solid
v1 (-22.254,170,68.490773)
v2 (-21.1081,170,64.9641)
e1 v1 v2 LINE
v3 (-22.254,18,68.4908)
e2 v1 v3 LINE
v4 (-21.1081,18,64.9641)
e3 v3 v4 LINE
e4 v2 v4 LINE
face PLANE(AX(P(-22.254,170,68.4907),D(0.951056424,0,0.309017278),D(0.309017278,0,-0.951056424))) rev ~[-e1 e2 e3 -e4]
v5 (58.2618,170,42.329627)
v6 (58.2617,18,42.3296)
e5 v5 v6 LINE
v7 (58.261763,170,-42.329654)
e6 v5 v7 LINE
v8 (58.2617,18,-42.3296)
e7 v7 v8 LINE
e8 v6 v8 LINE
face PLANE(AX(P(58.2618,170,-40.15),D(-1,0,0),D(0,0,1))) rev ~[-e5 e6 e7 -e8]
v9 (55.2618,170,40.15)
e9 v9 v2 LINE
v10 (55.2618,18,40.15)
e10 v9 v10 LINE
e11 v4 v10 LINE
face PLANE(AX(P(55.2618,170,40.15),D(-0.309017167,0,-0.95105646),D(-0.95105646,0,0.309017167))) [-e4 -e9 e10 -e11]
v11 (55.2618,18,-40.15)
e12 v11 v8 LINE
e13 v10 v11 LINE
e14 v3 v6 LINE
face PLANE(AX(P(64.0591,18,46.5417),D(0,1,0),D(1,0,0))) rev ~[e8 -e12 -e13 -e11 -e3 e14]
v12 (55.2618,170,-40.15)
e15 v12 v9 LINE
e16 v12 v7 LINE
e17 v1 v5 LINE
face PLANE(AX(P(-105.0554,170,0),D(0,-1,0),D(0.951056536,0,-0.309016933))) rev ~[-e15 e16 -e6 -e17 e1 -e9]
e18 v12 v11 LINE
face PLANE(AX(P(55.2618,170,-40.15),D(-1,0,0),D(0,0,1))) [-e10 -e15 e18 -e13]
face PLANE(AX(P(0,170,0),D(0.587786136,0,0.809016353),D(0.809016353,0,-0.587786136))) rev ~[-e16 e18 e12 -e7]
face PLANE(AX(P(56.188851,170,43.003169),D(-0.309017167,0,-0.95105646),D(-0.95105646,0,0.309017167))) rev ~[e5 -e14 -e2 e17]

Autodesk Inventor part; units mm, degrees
sketch "草图1" plane through (0, 0, 0) normal (0, 1, 0) x (-1, 0, 0)
  line L0 (82.5131, 0) -> (25.498, -78.4746)
  line L1 (25.498, -78.4746) -> (-66.7545, -48.5)
  line L2 (-66.7545, -48.5) -> (-66.7545, 48.5)
  line L3 (-66.7545, 48.5) -> (25.498, 78.4746)
  line L4 (25.498, 78.4746) -> (82.5131, 0)
  point P0 (0, 0)
  point P1 (0, 0)
  dimension "d0" = 97
ref_plane "工作平面1" through (0, 170, 0) normal (0, 1, 0) x (-1, 0, 0)
sketch "草图2" plane through (0, 170, 0) normal (0, 1, 0) x (-1, 0, 0)
  line L0 (105.0554, 0) -> (32.4639, -99.9136)
  line L1 (32.4639, -99.9136) -> (-84.9916, -61.75)
  line L2 (-84.9916, -61.75) -> (-84.9916, 61.75)
  line L3 (-84.9916, 61.75) -> (32.4639, 99.9136)
  line L4 (32.4639, 99.9136) -> (105.0554, 0)
  point P0 (0, 0)
  point P1 (0, 0)
  dimension "d2" = 123.5
loft "放样1" add profiles "草图2", "草图1"
sketch "草图3" plane through (84.9916, 170, 61.75) normal (0, 1, 0) x (1, 0, 0)
  line L0 (-153.2988, 61.75) -> (-106.0997, 126.7141)
  line L1 (-106.0997, 126.7141) -> (-29.7298, 101.9)
  line L2 (-29.7298, 101.9) -> (-29.7298, 21.6)
  line L3 (-29.7298, 21.6) -> (-106.0997, -3.2141)
  line L4 (-106.0997, -3.2141) -> (-153.2988, 61.75)
  point P0 (-84.9916, 61.75)
  point P1 (-84.9916, 61.75)
  dimension "d7" = 80.3
extrude "拉伸1" cut sketch "草图3" against normal blind 164
shell "抽壳1" thickness 3 removed faces 1 at (10.4732, 170, -75.5426)
sketch "草图5" plane through (66.7545, 0, -48.5) normal (0, -1, 0) x (1, 0, 0)
  line L0 (-98.0659, 144.8667) -> (-91.2229, 123.806) projected
  line L1 (-106.5917, 71.5) -> (-123.9122, 81.5)
  line L2 (-107.7408, 69.3836) -> (-125.561, 78.4634)
  arc A0 (-106.5917, 71.5) -> (-107.7408, 69.3836) centre (-66.7545, 48.5) ccw
  arc A1 (-123.9122, 81.5) -> (-125.561, 78.4634) centre (-66.7545, 48.5) ccw
  point P0 (-99.2814, 81.0269)
  dimension "d37" = 132
  dimension "d38" = 92
  dimension "d40" = 3
extrude "拉伸2" add sketch "草图5" along normal blind 3
sketch "草图7" plane through (66.7545, -3, -48.5) normal (0, -1, 0) x (1, 0, 0)
  arc A0 (-100.9392, 79.28) -> (-106.5917, 71.5) centre (-66.7545, 48.5) ccw
  arc A1 (-115.8021, 92.6626) -> (-125.561, 78.4634) centre (-66.7545, 48.5) ccw
  arc A2 (-100.9392, 79.28) -> (-107.7408, 69.3836) centre (-66.7545, 48.5) ccw
  line L0 (-100.9392, 79.28) -> (-115.8021, 92.6626)
  line L1 (-125.561, 78.4634) -> (-107.7408, 69.3836) projected
  line L2 (-107.7408, 69.3836) -> (-125.561, 78.4634)
  dimension "d25" = 92
  dimension "d41" = 15
extrude "拉伸3" add sketch "草图7" along normal blind 3
chamfer "倒角1" distance 1 angle 45 1 edges at (-41.6161, -3, 37.4713)
sketch "草图8" plane through (66.7545, 0, -48.5) normal (0, -1, 0) x (1, 0, 0)
  circle A0 centre (-66.7545, 48.5) radius 15
  dimension "d100" = 30
extrude "拉伸4" add sketch "草图8" along normal blind 30
pattern_circular "环形阵列1" count 10 over 360 about axis through (0, -10, 0) along (0, 1, 0) of "拉伸3", "拉伸2", "倒角1"
sketch "草图9" plane through (64.0591, 3, 46.5417) normal (0, 1, 0) x (1, 0, 0)
  line L0 (-132.3664, 46.5417) -> (-85.1672, 111.5058) projected
  line L1 (-85.1672, -18.4224) -> (-132.3664, 46.5417) projected
  line L2 (-8.7974, 6.3917) -> (-85.1672, -18.4224) projected
  line L3 (-8.7974, 86.6917) -> (-8.7974, 6.3917) projected
  line L4 (-85.1672, 111.5058) -> (-8.7974, 86.6917) projected
  line L5 (-136.0746, 46.5417) -> (-86.3131, -21.9491) projected
  line L6 (-86.3131, -21.9491) -> (-5.7974, 4.2121) projected
  line L7 (-5.7974, 4.2121) -> (-5.7974, 88.8713) projected
  line L8 (-5.7974, 88.8713) -> (-86.3131, 115.0325) projected
  line L9 (-86.3131, 115.0325) -> (-136.0746, 46.5417) projected
  line L10 (-85.1672, -18.4224) -> (-132.3664, 46.5417) projected
  line L11 (-132.3664, 46.5417) -> (-85.1672, 111.5058) projected
  line L12 (-85.1672, 111.5058) -> (-8.7974, 86.6917) projected
  line L13 (-8.7974, 86.6917) -> (-8.7974, 6.3917) projected
  line L14 (-8.7974, 6.3917) -> (-85.1672, -18.4224) projected
  line L15 (-143.2406, 46.5417) -> (-88.5276, 121.8477) projected
  line L16 (-88.5276, -28.7643) -> (-143.2406, 46.5417) projected
  line L17 (0, 0) -> (-88.5276, -28.7643) projected
  line L18 (0, 93.0834) -> (0, 0) projected
  line L19 (-88.5276, 121.8477) -> (0, 93.0834) projected
  line L20 (-145.4076, 46.5417) -> (-89.1972, 123.9087)
  line L21 (-89.1972, 123.9087) -> (1.7532, 94.3571)
  line L22 (1.7532, 94.3571) -> (1.7532, -1.2738)
  line L23 (1.7532, -1.2738) -> (-89.1972, -30.8253)
  line L24 (-89.1972, -30.8253) -> (-145.4076, 46.5417)
  point P0 (-64.0591, 46.5417)
extrude "拉伸5" add sketch "草图9" along normal blind 15 contours L15 L19 L18 L17 L16 | L20 L21 L22 L23 L24
sketch "草图10" plane through (84.9916, 6, 61.75) normal (0, 1, 0) x (1, 0, 0)
  line L0 (-153.2988, 61.75) -> (-106.0997, 126.7141) projected
  line L1 (-106.0997, -3.2141) -> (-153.2988, 61.75) projected
  line L2 (-29.7298, 21.6) -> (-106.0997, -3.2141) projected
  line L3 (-29.7298, 101.9) -> (-29.7298, 21.6) projected
  line L4 (-106.0997, 126.7141) -> (-29.7298, 101.9) projected
  line L5 (-107.2456, 130.2408) -> (-157.007, 61.75) projected
  line L6 (-26.7298, 104.0796) -> (-107.2456, 130.2408) projected
  line L7 (-26.7298, 19.4204) -> (-26.7298, 104.0796) projected
  line L8 (-107.2456, -6.7408) -> (-26.7298, 19.4204) projected
  line L9 (-157.007, 61.75) -> (-107.2456, -6.7408) projected
  line L10 (-166.1621, 61.75) -> (-110.0746, 138.9477) projected
  line L11 (-110.0746, -15.4477) -> (-166.1621, 61.75) projected
  line L12 (-19.3233, 14.0392) -> (-110.0746, -15.4477) projected
  line L13 (-19.3233, 109.4608) -> (-19.3233, 14.0392) projected
  line L14 (-110.0746, 138.9477) -> (-19.3233, 109.4608) projected
  point P0 (-84.9916, 61.75)
sketch "草图11" plane through (64.0591, 18, 46.5417) normal (0, 1, 0) x (1, 0, 0)
  line L0 (-64.0591, 46.5417) -> (2.6954, 46.5417) construction
  line L1 (-86.3131, 115.0325) -> (-136.0746, 46.5417) projected
  line L2 (-5.7974, 88.8713) -> (-86.3131, 115.0325) projected
  line L3 (-5.7974, 4.2121) -> (-5.7974, 88.8713) projected
  line L4 (-86.3131, -21.9491) -> (-5.7974, 4.2121) projected
  line L5 (-136.0746, 46.5417) -> (-86.3131, -21.9491) projected
  line L6 (-145.2296, 46.5417) -> (-89.1422, 123.7394) projected
  line L7 (-89.1422, -30.656) -> (-145.2296, 46.5417) projected
  line L8 (1.6092, -1.1691) -> (-89.1422, -30.656) projected
  line L9 (1.6092, 94.2525) -> (1.6092, -1.1691) projected
  line L10 (-89.1422, 123.7394) -> (1.6092, 94.2525) projected
  circle A0 centre (-2.0908, 11.2121) radius 1.25
  line L11 (-5.7974, 4.2121) -> (1.6092, -1.1691) construction
  line L12 (-5.7974, 4.2121) -> (-5.7974, 88.8713) projected
  line L13 (-86.3131, -21.9491) -> (-5.7974, 4.2121) projected
  line L14 (1.6092, -1.1691) -> (-89.1422, -30.656) projected
  line L15 (1.6092, 94.2525) -> (1.6092, -1.1691) projected
  circle A1 centre (-11.3094, -1.4762) radius 1.25
  line L16 (-2.0941, 7.5215) -> (-0.5941, 7.5215)
  line L17 (-0.5941, 7.5215) -> (-0.5941, 0.4317)
  line L18 (-2.0941, 7.5215) -> (-3.5941, 7.5215)
  line L19 (-3.5941, 7.5215) -> (-3.5941, 2.6113)
  line L20 (-7.8005, -0.3326) -> (-7.3369, -1.7592)
  line L21 (-7.3369, -1.7592) -> (-0.5941, 0.4317)
  line L22 (-7.8005, -0.3326) -> (-8.264, 1.094)
  line L23 (-8.264, 1.094) -> (-3.5941, 2.6113)
  dimension "d63" = 2.5
  dimension "d69" = 3.7
  dimension "d131" = 3.6906
extrude "拉伸7" cut sketch "草图11" against normal blind 3 contours A0 | A1 | L16 L17 L21 L20 L22 L23 L19 L18
extrude "拉伸8" add sketch "草图10" along normal blind 10 and the other way blind 3 contours L10 L14 L13 L12 L11
extrude "拉伸9" cut sketch "草图10" along normal blind 10 and the other way blind 3 contours L10 L14 L13 L12 L11
ref_plane "工作平面2" through (84.9916, 7, 61.75) normal (0, 1, 0) x (1, 0, 0)
sketch "草图12" plane through (84.9916, 7, 61.75) normal (0, 1, 0) x (1, 0, 0)
  line L0 (-107.2456, -6.7408) -> (-26.7298, 19.4204) projected
  line L1 (-60.7054, 8.3811) -> (-61.6324, 11.2342)
  line L2 (-29.7298, 21.6) -> (-106.0997, -3.2141) projected
  line L3 (-89.8404, 2.0689) -> (-88.9133, -0.7843)
  line L4 (-107.2456, -6.7408) -> (-26.7298, 19.4204) projected
  line L5 (-29.7298, 21.6) -> (-106.0997, -3.2141) projected
  line L6 (-63.5345, 10.6162) -> (-62.6075, 7.763)
  line L7 (-65.4366, 9.9982) -> (-64.5096, 7.145)
  line L8 (-67.3388, 9.3801) -> (-66.4117, 6.527)
  line L9 (-69.2409, 8.7621) -> (-68.3138, 5.9089)
  line L10 (-71.143, 8.1441) -> (-70.2159, 5.2909)
  line L11 (-73.0451, 7.526) -> (-72.118, 4.6729)
  line L12 (-74.9472, 6.908) -> (-74.0202, 4.0548)
  line L13 (-76.7905, 6.3091) -> (-75.7638, 3.4883)
  line L14 (-84.134, 3.923) -> (-83.207, 1.0698)
  line L15 (-86.0362, 3.305) -> (-85.1091, 0.4518)
  line L16 (-87.9383, 2.6869) -> (-87.0112, -0.1662)
  line L17 (-80.3298, 5.1591) -> (-79.4028, 2.3059)
  line L18 (-82.2319, 4.541) -> (-81.3049, 1.6879)
  line L19 (-78.4277, 5.7771) -> (-77.5006, 2.9239)
  line L20 (-61.6324, 11.2342) -> (-63.5345, 10.6162)
  line L21 (-62.6075, 7.763) -> (-60.7054, 8.3811)
  line L22 (-66.4117, 6.527) -> (-64.5096, 7.145)
  line L23 (-65.4366, 9.9982) -> (-67.3388, 9.3801)
  line L24 (-70.2159, 5.2909) -> (-68.3138, 5.9089)
  line L25 (-69.2409, 8.7621) -> (-71.143, 8.1441)
  line L26 (-74.0202, 4.0548) -> (-72.118, 4.6729)
  line L27 (-73.0451, 7.526) -> (-74.9472, 6.908)
  line L28 (-76.7905, 6.3091) -> (-78.4277, 5.7771)
  line L29 (-77.5006, 2.9239) -> (-75.7638, 3.4883)
  line L30 (-81.3049, 1.6879) -> (-79.4028, 2.3059)
  line L31 (-80.3298, 5.1591) -> (-82.2319, 4.541)
  line L32 (-84.134, 3.923) -> (-86.0362, 3.305)
  line L33 (-87.9383, 2.6869) -> (-89.8404, 2.0689)
  line L34 (-88.9133, -0.7843) -> (-87.0112, -0.1662)
  line L35 (-85.1091, 0.4518) -> (-83.207, 1.0698)
  line L36 (-58.8033, 8.9991) -> (-59.7303, 11.8523)
  line L37 (-56.9011, 9.6171) -> (-57.8282, 12.4703)
  line L38 (-54.999, 10.2352) -> (-55.9261, 13.0883)
  line L39 (-53.0969, 10.8532) -> (-54.024, 13.7064)
  point P0 (-84.9916, 61.75)
  dimension "d73" = 2
  dimension "d74" = 2
  dimension "d75" = 2
  dimension "d76" = 2
  dimension "d77" = 2
  dimension "d78" = 2
  dimension "d79" = 2
  dimension "d80" = 2
  dimension "d81" = 2
  dimension "d82" = 2
  dimension "d83" = 2
  dimension "d84" = 2
  dimension "d85" = 2
  dimension "d86" = 2
  dimension "d88" = 2
  dimension "d89" = 2
  dimension "d90" = 2
  dimension "d91" = 2
extrude "拉伸10" cut sketch "草图12" along normal blind 7 contours L3 L2 L16 L0 | L15 L2 L14 L0 | L18 L2 L17 L0 | L19 L2 L13 L0 | L12 L2 L11 L0 | L10 L2 L9 L0 | L8 L2 L7 L0 | L6 L2 L1 L0 | L36 L2 L37 L0 | L38 L2 L39 L0
pattern_circular "环形阵列2" count 5 over 360 about axis through (0, 0, 0) along (0, -1, 0) of "拉伸10"
sketch "草图13" plane through (66.7545, 0, -48.5) normal (0, -1, 0) x (1, 0, 0)
  line L0 (1.9326, 98.4258) -> (-1.1068, 96.2175) construction
  line L1 (18.2371, 110.25) -> (0, 97) construction
  line L2 (-16.2555, 104.3138) -> (1.9326, 98.4258)
  line L3 (1.9326, 98.4258) -> (1.9326, 79.28)
  line L4 (-14.6399, 100.6147) -> (-1.1068, 96.2175)
  line L5 (-1.0862, 96.2108) -> (-1.0862, 81.9597)
  line L6 (-1.0862, 81.9597) -> (1.9326, 79.28)
  line L7 (-14.6399, 100.6147) -> (-16.2555, 104.3138)
  line L8 (1.9326, 98.4258) -> (1.9326, 79.28)
  line L9 (1.9326, 79.28) -> (-1.0862, 81.9597)
  line L10 (-1.0862, 0.7892) -> (-1.0862, 96.2108) projected
  line L11 (-1.0862, 81.9597) -> (-1.0862, 96.2108)
  line L12 (-1.0862, 96.2108) -> (-14.6399, 100.6147)
  line L13 (-91.8376, 125.6977) -> (-1.0862, 96.2108) projected
  line L14 (0, 97) -> (-92.2525, 126.9746) projected
  line L15 (-14.6399, 100.6147) -> (-16.2555, 104.3138)
  line L16 (-16.2555, 104.3138) -> (1.9326, 98.4258)
  point P0 (-66.7545, 48.5)
  point P1 (18.2371, 110.25)
extrude "拉伸11" cut sketch "草图13" against normal blind 16
sketch "草图14" plane through (0, -30, 0) normal (0, -1, 0) x (1, 0, 0)
  line L0 (11.4602, -0.9019) -> (-11.5398, -0.9019)
  line L1 (-11.5398, -0.9019) -> (-11.5398, 0.7981)
  line L2 (-11.5398, 0.7981) -> (11.4602, 0.7981)
  line L3 (11.4602, 0.7981) -> (11.4602, -0.9019)
  line L4 (15.9292, -0.0519) -> (-16.622, -0.0519) construction
  line L5 (-0.0398, 4.6584) -> (-0.0398, -5.7431) construction
  point P0 (0, 0)
  dimension "d94" = 23
  dimension "d95" = 1.7
extrude "拉伸12" cut sketch "草图14" along normal blind 10 and the other way blind 54.75
sketch "草图15" plane through (0, -30, 0) normal (0, -1, 0) x (1, 0, 0)
  line L0 (11.4602, 0.7981) -> (-11.5398, 0.7981) projected
  line L1 (9.9602, 0.7981) -> (-10.0398, 0.7981)
  line L2 (-10.0398, 0.7981) -> (-10.0398, 2.5981)
  line L3 (-10.0398, 2.5981) -> (9.9602, 2.5981)
  line L4 (9.9602, 2.5981) -> (9.9602, 0.7981)
  line L5 (11.4602, -0.9019) -> (-11.5398, -0.9019) projected
  line L6 (-0.0398, 30.3943) -> (-0.0398, -31.216) construction
  point P0 (0, 0)
  dimension "d101" = 3.5
  dimension "d102" = 20
extrude "拉伸13" cut sketch "草图15" against normal blind 30
sketch "草图16" plane through (0, -30, 0) normal (0, -1, 0) x (1, 0, 0)
  line L0 (11.4602, 0.7981) -> (-11.5398, 0.7981) projected
  line L1 (-5.5398, 0.7981) -> (5.4602, 0.7981)
  line L2 (5.4602, 0.7981) -> (5.4602, 6.5981)
  line L3 (5.4602, 6.5981) -> (-5.5398, 6.5981)
  line L4 (-5.5398, 6.5981) -> (-5.5398, 0.7981)
  line L5 (11.4602, -0.9019) -> (-11.5398, -0.9019) projected
  line L6 (-0.0398, 25.7819) -> (-0.0398, -22.2478) construction
  point P0 (0, 0)
  dimension "d105" = 7.5
  dimension "d106" = 11
extrude "拉伸14" cut sketch "草图16" against normal blind 6
ref_plane "工作平面3" through (0, -28, 0) normal (0, -1, 0) x (1, 0, 0)
sketch "草图18" plane through (0, -28, 0) normal (0, -1, 0) x (1, 0, 0)
  line L0 (5.4602, 6.5981) -> (5.4602, 2.5981) projected
  line L1 (5.4602, 2.5981) -> (9.9602, 2.5981) projected
  line L2 (9.9602, 2.5981) -> (9.9602, 0.7981) projected
  line L3 (9.9602, 0.7981) -> (11.4602, 0.7981) projected
  line L4 (11.4602, 0.7981) -> (11.4602, -0.9019) projected
  line L5 (11.4602, -0.9019) -> (-11.5398, -0.9019) projected
  line L6 (-11.5398, -0.9019) -> (-11.5398, 0.7981) projected
  line L7 (-11.5398, 0.7981) -> (-10.0398, 0.7981) projected
  line L8 (-10.0398, 0.7981) -> (-10.0398, 2.5981) projected
  line L9 (-10.0398, 2.5981) -> (-5.5398, 2.5981) projected
  line L10 (-5.5398, 2.5981) -> (-5.5398, 6.5981) projected
  line L11 (-5.5398, 6.5981) -> (5.4602, 6.5981) projected
  circle A0 centre (0, 0) radius 15 projected
  line L12 (-12.5398, -1.9019) -> (12.4602, -1.9019)
  line L13 (12.4602, -1.9019) -> (12.4602, 1.7981)
  line L14 (12.4602, 1.7981) -> (10.9602, 1.7981)
  line L15 (10.9602, 1.7981) -> (10.9602, 3.5981)
  line L16 (10.9602, 3.5981) -> (6.4602, 3.5981)
  line L17 (6.4602, 3.5981) -> (6.4602, 7.5981)
  line L18 (6.4602, 7.5981) -> (-6.5398, 7.5981)
  line L19 (-6.5398, 7.5981) -> (-6.5398, 3.5981)
  line L20 (-6.5398, 3.5981) -> (-11.0398, 3.5981)
  line L21 (-11.0398, 3.5981) -> (-11.0398, 1.7981)
  line L22 (-11.0398, 1.7981) -> (-12.5398, 1.7981)
  line L23 (-12.5398, 1.7981) -> (-12.5398, -1.9019)
  circle A1 centre (0, 0) radius 14
  point P0 (0, 0)
  dimension "d110" = 1
  dimension "d111" = 1
extrude "拉伸15" cut sketch "草图18" against normal blind 30 contours A1
sketch "草图19" plane through (66.7545, 0, -48.5) normal (0, -1, 0) x (1, 0, 0)
  line L0 (-60.2943, 56.0981) -> (-73.2943, 56.0981) projected
  line L1 (-73.2943, 52.0981) -> (-77.7943, 52.0981) projected
  line L2 (-60.2943, 56.0981) -> (-73.2943, 56.0981)
  line L3 (-73.2943, 56.0981) -> (-73.2943, 52.0981)
  line L4 (-73.2943, 52.0981) -> (-60.2943, 52.0981)
  line L5 (-60.2943, 52.0981) -> (-60.2943, 56.0981)
  point P0 (-66.7545, 48.5)
extrude "拉伸16" cut sketch "草图19" along normal blind 22 and the other way blind 2
sketch "草图21" plane through (0, -30, 0) normal (0, -1, 0) x (1, 0, 0)
  line L0 (5.4602, 6.5981) -> (5.4602, 2.5981) projected
  line L1 (5.4602, 2.5981) -> (9.9602, 2.5981) projected
  line L2 (9.9602, 2.5981) -> (9.9602, 0.7981) projected
  line L3 (9.9602, 0.7981) -> (11.4602, 0.7981) projected
  line L4 (11.4602, 0.7981) -> (11.4602, -0.9019) projected
  line L5 (11.4602, -0.9019) -> (-11.5398, -0.9019) projected
  line L6 (-11.5398, -0.9019) -> (-11.5398, 0.7981) projected
  line L7 (-11.5398, 0.7981) -> (-10.0398, 0.7981) projected
  line L8 (-10.0398, 0.7981) -> (-10.0398, 2.5981) projected
  line L9 (-10.0398, 2.5981) -> (-5.5398, 2.5981) projected
  line L10 (-5.5398, 2.5981) -> (-5.5398, 6.5981) projected
  line L11 (-5.5398, 6.5981) -> (5.4602, 6.5981) projected
  circle A0 centre (0, 0) radius 15 projected
  point P0 (0, 0)
extrude "拉伸17" add sketch "草图21" along normal blind 3
sketch "草图22" plane through (5.4602, -24, 6.5981) normal (0, 0, -1) x (-1, 0, 0)
  line L0 (9.1141, -4) -> (1.9525, -4)
  line L1 (1.9525, -4) -> (9.1141, -4)
  line L2 (9.1141, -4) -> (9.1141, -9.2971)
  line L3 (9.1141, -9.2971) -> (1.9525, -9.2971)
  line L4 (1.9525, -9.2971) -> (1.9525, -4)
  point P0 (5.4602, 24)
extrude "拉伸18" cut sketch "草图22" against normal blind 10
sketch "草图23" plane through (0, -33, 0) normal (0, -1, 0) x (1, 0, 0)
  line L0 (5.555, -0.8779) -> (-5.9531, -0.8779)
  line L1 (-5.9531, -0.8779) -> (-5.9531, -3.3779)
  line L2 (-5.9531, -3.3779) -> (5.555, -3.3779)
  line L3 (5.555, -3.3779) -> (5.555, -0.8779)
  point P0 (0, 0)
  dimension "d125" = 2.5
extrude "拉伸19" cut sketch "草图23" against normal blind 10
sketch "草图24" plane through (64.0591, 18, 46.5417) normal (0, 1, 0) x (1, 0, 0)
  line L0 (-5.7974, 4.2121) -> (-5.7974, 88.8713) projected
  circle A0 centre (-64.0591, 46.5417) radius 14 projected
  line L1 (-75.5989, 45.7436) -> (-75.5989, 47.4436) projected
  line L2 (-75.5989, 47.4436) -> (-52.5989, 47.4436) projected
  line L3 (-52.5989, 47.4436) -> (-52.5989, 45.7436) projected
  line L4 (-52.5989, 45.7436) -> (-75.5989, 45.7436) projected
  line L5 (-132.3664, 46.5417) -> (-85.1672, 111.5058) projected
  line L6 (-85.1672, -18.4224) -> (-132.3664, 46.5417) projected
  line L7 (-8.7974, 6.3917) -> (-85.1672, -18.4224) projected
  line L8 (-8.7974, 86.6917) -> (-8.7974, 6.3917) projected
  line L9 (-85.1672, 111.5058) -> (-8.7974, 86.6917) projected
  line L10 (-87.2718, 117.9831) -> (-139.177, 46.5417)
  line L11 (-139.177, 46.5417) -> (-87.2718, -24.8997)
  line L12 (-87.2718, -24.8997) -> (-3.2875, 2.3885)
  line L13 (-3.2875, 2.3885) -> (-3.2875, 90.6949)
  line L14 (-3.2875, 90.6949) -> (-87.2718, 117.9831)
  point P0 (-64.0591, 46.5417)
extrude "拉伸20" cut sketch "草图24" along normal blind 300 contours L5 L9 L8 L7 L6 | L14 L13 L12 L11 L10 keep common part
sketch "草图25" plane through (58.2617, 170, 42.3296) normal (0, 1, 0) x (1, 0, 0)
  line L0 (0, 84.6593) -> (-80.5157, 110.8204) projected
  line L1 (-58.2617, 42.3296) -> (0, 84.6593)
  line L2 (0, 84.6593) -> (84.1147, -16.0689)
  line L3 (84.1147, -16.0689) -> (-101.6889, -60.8833)
  line L4 (-130.2772, 42.3296) -> (-80.5157, -26.1611) projected
  line L5 (-101.6889, -60.8833) -> (-80.5157, -26.1611)
  line L6 (-80.5157, -26.1611) -> (-58.2617, 42.3296)
  point P0 (0, 0)
extrude "拉伸21" cut sketch "草图25" against normal blind 10010 keep common part
properties part number "花盆主体" material "尼龙 6/6"
